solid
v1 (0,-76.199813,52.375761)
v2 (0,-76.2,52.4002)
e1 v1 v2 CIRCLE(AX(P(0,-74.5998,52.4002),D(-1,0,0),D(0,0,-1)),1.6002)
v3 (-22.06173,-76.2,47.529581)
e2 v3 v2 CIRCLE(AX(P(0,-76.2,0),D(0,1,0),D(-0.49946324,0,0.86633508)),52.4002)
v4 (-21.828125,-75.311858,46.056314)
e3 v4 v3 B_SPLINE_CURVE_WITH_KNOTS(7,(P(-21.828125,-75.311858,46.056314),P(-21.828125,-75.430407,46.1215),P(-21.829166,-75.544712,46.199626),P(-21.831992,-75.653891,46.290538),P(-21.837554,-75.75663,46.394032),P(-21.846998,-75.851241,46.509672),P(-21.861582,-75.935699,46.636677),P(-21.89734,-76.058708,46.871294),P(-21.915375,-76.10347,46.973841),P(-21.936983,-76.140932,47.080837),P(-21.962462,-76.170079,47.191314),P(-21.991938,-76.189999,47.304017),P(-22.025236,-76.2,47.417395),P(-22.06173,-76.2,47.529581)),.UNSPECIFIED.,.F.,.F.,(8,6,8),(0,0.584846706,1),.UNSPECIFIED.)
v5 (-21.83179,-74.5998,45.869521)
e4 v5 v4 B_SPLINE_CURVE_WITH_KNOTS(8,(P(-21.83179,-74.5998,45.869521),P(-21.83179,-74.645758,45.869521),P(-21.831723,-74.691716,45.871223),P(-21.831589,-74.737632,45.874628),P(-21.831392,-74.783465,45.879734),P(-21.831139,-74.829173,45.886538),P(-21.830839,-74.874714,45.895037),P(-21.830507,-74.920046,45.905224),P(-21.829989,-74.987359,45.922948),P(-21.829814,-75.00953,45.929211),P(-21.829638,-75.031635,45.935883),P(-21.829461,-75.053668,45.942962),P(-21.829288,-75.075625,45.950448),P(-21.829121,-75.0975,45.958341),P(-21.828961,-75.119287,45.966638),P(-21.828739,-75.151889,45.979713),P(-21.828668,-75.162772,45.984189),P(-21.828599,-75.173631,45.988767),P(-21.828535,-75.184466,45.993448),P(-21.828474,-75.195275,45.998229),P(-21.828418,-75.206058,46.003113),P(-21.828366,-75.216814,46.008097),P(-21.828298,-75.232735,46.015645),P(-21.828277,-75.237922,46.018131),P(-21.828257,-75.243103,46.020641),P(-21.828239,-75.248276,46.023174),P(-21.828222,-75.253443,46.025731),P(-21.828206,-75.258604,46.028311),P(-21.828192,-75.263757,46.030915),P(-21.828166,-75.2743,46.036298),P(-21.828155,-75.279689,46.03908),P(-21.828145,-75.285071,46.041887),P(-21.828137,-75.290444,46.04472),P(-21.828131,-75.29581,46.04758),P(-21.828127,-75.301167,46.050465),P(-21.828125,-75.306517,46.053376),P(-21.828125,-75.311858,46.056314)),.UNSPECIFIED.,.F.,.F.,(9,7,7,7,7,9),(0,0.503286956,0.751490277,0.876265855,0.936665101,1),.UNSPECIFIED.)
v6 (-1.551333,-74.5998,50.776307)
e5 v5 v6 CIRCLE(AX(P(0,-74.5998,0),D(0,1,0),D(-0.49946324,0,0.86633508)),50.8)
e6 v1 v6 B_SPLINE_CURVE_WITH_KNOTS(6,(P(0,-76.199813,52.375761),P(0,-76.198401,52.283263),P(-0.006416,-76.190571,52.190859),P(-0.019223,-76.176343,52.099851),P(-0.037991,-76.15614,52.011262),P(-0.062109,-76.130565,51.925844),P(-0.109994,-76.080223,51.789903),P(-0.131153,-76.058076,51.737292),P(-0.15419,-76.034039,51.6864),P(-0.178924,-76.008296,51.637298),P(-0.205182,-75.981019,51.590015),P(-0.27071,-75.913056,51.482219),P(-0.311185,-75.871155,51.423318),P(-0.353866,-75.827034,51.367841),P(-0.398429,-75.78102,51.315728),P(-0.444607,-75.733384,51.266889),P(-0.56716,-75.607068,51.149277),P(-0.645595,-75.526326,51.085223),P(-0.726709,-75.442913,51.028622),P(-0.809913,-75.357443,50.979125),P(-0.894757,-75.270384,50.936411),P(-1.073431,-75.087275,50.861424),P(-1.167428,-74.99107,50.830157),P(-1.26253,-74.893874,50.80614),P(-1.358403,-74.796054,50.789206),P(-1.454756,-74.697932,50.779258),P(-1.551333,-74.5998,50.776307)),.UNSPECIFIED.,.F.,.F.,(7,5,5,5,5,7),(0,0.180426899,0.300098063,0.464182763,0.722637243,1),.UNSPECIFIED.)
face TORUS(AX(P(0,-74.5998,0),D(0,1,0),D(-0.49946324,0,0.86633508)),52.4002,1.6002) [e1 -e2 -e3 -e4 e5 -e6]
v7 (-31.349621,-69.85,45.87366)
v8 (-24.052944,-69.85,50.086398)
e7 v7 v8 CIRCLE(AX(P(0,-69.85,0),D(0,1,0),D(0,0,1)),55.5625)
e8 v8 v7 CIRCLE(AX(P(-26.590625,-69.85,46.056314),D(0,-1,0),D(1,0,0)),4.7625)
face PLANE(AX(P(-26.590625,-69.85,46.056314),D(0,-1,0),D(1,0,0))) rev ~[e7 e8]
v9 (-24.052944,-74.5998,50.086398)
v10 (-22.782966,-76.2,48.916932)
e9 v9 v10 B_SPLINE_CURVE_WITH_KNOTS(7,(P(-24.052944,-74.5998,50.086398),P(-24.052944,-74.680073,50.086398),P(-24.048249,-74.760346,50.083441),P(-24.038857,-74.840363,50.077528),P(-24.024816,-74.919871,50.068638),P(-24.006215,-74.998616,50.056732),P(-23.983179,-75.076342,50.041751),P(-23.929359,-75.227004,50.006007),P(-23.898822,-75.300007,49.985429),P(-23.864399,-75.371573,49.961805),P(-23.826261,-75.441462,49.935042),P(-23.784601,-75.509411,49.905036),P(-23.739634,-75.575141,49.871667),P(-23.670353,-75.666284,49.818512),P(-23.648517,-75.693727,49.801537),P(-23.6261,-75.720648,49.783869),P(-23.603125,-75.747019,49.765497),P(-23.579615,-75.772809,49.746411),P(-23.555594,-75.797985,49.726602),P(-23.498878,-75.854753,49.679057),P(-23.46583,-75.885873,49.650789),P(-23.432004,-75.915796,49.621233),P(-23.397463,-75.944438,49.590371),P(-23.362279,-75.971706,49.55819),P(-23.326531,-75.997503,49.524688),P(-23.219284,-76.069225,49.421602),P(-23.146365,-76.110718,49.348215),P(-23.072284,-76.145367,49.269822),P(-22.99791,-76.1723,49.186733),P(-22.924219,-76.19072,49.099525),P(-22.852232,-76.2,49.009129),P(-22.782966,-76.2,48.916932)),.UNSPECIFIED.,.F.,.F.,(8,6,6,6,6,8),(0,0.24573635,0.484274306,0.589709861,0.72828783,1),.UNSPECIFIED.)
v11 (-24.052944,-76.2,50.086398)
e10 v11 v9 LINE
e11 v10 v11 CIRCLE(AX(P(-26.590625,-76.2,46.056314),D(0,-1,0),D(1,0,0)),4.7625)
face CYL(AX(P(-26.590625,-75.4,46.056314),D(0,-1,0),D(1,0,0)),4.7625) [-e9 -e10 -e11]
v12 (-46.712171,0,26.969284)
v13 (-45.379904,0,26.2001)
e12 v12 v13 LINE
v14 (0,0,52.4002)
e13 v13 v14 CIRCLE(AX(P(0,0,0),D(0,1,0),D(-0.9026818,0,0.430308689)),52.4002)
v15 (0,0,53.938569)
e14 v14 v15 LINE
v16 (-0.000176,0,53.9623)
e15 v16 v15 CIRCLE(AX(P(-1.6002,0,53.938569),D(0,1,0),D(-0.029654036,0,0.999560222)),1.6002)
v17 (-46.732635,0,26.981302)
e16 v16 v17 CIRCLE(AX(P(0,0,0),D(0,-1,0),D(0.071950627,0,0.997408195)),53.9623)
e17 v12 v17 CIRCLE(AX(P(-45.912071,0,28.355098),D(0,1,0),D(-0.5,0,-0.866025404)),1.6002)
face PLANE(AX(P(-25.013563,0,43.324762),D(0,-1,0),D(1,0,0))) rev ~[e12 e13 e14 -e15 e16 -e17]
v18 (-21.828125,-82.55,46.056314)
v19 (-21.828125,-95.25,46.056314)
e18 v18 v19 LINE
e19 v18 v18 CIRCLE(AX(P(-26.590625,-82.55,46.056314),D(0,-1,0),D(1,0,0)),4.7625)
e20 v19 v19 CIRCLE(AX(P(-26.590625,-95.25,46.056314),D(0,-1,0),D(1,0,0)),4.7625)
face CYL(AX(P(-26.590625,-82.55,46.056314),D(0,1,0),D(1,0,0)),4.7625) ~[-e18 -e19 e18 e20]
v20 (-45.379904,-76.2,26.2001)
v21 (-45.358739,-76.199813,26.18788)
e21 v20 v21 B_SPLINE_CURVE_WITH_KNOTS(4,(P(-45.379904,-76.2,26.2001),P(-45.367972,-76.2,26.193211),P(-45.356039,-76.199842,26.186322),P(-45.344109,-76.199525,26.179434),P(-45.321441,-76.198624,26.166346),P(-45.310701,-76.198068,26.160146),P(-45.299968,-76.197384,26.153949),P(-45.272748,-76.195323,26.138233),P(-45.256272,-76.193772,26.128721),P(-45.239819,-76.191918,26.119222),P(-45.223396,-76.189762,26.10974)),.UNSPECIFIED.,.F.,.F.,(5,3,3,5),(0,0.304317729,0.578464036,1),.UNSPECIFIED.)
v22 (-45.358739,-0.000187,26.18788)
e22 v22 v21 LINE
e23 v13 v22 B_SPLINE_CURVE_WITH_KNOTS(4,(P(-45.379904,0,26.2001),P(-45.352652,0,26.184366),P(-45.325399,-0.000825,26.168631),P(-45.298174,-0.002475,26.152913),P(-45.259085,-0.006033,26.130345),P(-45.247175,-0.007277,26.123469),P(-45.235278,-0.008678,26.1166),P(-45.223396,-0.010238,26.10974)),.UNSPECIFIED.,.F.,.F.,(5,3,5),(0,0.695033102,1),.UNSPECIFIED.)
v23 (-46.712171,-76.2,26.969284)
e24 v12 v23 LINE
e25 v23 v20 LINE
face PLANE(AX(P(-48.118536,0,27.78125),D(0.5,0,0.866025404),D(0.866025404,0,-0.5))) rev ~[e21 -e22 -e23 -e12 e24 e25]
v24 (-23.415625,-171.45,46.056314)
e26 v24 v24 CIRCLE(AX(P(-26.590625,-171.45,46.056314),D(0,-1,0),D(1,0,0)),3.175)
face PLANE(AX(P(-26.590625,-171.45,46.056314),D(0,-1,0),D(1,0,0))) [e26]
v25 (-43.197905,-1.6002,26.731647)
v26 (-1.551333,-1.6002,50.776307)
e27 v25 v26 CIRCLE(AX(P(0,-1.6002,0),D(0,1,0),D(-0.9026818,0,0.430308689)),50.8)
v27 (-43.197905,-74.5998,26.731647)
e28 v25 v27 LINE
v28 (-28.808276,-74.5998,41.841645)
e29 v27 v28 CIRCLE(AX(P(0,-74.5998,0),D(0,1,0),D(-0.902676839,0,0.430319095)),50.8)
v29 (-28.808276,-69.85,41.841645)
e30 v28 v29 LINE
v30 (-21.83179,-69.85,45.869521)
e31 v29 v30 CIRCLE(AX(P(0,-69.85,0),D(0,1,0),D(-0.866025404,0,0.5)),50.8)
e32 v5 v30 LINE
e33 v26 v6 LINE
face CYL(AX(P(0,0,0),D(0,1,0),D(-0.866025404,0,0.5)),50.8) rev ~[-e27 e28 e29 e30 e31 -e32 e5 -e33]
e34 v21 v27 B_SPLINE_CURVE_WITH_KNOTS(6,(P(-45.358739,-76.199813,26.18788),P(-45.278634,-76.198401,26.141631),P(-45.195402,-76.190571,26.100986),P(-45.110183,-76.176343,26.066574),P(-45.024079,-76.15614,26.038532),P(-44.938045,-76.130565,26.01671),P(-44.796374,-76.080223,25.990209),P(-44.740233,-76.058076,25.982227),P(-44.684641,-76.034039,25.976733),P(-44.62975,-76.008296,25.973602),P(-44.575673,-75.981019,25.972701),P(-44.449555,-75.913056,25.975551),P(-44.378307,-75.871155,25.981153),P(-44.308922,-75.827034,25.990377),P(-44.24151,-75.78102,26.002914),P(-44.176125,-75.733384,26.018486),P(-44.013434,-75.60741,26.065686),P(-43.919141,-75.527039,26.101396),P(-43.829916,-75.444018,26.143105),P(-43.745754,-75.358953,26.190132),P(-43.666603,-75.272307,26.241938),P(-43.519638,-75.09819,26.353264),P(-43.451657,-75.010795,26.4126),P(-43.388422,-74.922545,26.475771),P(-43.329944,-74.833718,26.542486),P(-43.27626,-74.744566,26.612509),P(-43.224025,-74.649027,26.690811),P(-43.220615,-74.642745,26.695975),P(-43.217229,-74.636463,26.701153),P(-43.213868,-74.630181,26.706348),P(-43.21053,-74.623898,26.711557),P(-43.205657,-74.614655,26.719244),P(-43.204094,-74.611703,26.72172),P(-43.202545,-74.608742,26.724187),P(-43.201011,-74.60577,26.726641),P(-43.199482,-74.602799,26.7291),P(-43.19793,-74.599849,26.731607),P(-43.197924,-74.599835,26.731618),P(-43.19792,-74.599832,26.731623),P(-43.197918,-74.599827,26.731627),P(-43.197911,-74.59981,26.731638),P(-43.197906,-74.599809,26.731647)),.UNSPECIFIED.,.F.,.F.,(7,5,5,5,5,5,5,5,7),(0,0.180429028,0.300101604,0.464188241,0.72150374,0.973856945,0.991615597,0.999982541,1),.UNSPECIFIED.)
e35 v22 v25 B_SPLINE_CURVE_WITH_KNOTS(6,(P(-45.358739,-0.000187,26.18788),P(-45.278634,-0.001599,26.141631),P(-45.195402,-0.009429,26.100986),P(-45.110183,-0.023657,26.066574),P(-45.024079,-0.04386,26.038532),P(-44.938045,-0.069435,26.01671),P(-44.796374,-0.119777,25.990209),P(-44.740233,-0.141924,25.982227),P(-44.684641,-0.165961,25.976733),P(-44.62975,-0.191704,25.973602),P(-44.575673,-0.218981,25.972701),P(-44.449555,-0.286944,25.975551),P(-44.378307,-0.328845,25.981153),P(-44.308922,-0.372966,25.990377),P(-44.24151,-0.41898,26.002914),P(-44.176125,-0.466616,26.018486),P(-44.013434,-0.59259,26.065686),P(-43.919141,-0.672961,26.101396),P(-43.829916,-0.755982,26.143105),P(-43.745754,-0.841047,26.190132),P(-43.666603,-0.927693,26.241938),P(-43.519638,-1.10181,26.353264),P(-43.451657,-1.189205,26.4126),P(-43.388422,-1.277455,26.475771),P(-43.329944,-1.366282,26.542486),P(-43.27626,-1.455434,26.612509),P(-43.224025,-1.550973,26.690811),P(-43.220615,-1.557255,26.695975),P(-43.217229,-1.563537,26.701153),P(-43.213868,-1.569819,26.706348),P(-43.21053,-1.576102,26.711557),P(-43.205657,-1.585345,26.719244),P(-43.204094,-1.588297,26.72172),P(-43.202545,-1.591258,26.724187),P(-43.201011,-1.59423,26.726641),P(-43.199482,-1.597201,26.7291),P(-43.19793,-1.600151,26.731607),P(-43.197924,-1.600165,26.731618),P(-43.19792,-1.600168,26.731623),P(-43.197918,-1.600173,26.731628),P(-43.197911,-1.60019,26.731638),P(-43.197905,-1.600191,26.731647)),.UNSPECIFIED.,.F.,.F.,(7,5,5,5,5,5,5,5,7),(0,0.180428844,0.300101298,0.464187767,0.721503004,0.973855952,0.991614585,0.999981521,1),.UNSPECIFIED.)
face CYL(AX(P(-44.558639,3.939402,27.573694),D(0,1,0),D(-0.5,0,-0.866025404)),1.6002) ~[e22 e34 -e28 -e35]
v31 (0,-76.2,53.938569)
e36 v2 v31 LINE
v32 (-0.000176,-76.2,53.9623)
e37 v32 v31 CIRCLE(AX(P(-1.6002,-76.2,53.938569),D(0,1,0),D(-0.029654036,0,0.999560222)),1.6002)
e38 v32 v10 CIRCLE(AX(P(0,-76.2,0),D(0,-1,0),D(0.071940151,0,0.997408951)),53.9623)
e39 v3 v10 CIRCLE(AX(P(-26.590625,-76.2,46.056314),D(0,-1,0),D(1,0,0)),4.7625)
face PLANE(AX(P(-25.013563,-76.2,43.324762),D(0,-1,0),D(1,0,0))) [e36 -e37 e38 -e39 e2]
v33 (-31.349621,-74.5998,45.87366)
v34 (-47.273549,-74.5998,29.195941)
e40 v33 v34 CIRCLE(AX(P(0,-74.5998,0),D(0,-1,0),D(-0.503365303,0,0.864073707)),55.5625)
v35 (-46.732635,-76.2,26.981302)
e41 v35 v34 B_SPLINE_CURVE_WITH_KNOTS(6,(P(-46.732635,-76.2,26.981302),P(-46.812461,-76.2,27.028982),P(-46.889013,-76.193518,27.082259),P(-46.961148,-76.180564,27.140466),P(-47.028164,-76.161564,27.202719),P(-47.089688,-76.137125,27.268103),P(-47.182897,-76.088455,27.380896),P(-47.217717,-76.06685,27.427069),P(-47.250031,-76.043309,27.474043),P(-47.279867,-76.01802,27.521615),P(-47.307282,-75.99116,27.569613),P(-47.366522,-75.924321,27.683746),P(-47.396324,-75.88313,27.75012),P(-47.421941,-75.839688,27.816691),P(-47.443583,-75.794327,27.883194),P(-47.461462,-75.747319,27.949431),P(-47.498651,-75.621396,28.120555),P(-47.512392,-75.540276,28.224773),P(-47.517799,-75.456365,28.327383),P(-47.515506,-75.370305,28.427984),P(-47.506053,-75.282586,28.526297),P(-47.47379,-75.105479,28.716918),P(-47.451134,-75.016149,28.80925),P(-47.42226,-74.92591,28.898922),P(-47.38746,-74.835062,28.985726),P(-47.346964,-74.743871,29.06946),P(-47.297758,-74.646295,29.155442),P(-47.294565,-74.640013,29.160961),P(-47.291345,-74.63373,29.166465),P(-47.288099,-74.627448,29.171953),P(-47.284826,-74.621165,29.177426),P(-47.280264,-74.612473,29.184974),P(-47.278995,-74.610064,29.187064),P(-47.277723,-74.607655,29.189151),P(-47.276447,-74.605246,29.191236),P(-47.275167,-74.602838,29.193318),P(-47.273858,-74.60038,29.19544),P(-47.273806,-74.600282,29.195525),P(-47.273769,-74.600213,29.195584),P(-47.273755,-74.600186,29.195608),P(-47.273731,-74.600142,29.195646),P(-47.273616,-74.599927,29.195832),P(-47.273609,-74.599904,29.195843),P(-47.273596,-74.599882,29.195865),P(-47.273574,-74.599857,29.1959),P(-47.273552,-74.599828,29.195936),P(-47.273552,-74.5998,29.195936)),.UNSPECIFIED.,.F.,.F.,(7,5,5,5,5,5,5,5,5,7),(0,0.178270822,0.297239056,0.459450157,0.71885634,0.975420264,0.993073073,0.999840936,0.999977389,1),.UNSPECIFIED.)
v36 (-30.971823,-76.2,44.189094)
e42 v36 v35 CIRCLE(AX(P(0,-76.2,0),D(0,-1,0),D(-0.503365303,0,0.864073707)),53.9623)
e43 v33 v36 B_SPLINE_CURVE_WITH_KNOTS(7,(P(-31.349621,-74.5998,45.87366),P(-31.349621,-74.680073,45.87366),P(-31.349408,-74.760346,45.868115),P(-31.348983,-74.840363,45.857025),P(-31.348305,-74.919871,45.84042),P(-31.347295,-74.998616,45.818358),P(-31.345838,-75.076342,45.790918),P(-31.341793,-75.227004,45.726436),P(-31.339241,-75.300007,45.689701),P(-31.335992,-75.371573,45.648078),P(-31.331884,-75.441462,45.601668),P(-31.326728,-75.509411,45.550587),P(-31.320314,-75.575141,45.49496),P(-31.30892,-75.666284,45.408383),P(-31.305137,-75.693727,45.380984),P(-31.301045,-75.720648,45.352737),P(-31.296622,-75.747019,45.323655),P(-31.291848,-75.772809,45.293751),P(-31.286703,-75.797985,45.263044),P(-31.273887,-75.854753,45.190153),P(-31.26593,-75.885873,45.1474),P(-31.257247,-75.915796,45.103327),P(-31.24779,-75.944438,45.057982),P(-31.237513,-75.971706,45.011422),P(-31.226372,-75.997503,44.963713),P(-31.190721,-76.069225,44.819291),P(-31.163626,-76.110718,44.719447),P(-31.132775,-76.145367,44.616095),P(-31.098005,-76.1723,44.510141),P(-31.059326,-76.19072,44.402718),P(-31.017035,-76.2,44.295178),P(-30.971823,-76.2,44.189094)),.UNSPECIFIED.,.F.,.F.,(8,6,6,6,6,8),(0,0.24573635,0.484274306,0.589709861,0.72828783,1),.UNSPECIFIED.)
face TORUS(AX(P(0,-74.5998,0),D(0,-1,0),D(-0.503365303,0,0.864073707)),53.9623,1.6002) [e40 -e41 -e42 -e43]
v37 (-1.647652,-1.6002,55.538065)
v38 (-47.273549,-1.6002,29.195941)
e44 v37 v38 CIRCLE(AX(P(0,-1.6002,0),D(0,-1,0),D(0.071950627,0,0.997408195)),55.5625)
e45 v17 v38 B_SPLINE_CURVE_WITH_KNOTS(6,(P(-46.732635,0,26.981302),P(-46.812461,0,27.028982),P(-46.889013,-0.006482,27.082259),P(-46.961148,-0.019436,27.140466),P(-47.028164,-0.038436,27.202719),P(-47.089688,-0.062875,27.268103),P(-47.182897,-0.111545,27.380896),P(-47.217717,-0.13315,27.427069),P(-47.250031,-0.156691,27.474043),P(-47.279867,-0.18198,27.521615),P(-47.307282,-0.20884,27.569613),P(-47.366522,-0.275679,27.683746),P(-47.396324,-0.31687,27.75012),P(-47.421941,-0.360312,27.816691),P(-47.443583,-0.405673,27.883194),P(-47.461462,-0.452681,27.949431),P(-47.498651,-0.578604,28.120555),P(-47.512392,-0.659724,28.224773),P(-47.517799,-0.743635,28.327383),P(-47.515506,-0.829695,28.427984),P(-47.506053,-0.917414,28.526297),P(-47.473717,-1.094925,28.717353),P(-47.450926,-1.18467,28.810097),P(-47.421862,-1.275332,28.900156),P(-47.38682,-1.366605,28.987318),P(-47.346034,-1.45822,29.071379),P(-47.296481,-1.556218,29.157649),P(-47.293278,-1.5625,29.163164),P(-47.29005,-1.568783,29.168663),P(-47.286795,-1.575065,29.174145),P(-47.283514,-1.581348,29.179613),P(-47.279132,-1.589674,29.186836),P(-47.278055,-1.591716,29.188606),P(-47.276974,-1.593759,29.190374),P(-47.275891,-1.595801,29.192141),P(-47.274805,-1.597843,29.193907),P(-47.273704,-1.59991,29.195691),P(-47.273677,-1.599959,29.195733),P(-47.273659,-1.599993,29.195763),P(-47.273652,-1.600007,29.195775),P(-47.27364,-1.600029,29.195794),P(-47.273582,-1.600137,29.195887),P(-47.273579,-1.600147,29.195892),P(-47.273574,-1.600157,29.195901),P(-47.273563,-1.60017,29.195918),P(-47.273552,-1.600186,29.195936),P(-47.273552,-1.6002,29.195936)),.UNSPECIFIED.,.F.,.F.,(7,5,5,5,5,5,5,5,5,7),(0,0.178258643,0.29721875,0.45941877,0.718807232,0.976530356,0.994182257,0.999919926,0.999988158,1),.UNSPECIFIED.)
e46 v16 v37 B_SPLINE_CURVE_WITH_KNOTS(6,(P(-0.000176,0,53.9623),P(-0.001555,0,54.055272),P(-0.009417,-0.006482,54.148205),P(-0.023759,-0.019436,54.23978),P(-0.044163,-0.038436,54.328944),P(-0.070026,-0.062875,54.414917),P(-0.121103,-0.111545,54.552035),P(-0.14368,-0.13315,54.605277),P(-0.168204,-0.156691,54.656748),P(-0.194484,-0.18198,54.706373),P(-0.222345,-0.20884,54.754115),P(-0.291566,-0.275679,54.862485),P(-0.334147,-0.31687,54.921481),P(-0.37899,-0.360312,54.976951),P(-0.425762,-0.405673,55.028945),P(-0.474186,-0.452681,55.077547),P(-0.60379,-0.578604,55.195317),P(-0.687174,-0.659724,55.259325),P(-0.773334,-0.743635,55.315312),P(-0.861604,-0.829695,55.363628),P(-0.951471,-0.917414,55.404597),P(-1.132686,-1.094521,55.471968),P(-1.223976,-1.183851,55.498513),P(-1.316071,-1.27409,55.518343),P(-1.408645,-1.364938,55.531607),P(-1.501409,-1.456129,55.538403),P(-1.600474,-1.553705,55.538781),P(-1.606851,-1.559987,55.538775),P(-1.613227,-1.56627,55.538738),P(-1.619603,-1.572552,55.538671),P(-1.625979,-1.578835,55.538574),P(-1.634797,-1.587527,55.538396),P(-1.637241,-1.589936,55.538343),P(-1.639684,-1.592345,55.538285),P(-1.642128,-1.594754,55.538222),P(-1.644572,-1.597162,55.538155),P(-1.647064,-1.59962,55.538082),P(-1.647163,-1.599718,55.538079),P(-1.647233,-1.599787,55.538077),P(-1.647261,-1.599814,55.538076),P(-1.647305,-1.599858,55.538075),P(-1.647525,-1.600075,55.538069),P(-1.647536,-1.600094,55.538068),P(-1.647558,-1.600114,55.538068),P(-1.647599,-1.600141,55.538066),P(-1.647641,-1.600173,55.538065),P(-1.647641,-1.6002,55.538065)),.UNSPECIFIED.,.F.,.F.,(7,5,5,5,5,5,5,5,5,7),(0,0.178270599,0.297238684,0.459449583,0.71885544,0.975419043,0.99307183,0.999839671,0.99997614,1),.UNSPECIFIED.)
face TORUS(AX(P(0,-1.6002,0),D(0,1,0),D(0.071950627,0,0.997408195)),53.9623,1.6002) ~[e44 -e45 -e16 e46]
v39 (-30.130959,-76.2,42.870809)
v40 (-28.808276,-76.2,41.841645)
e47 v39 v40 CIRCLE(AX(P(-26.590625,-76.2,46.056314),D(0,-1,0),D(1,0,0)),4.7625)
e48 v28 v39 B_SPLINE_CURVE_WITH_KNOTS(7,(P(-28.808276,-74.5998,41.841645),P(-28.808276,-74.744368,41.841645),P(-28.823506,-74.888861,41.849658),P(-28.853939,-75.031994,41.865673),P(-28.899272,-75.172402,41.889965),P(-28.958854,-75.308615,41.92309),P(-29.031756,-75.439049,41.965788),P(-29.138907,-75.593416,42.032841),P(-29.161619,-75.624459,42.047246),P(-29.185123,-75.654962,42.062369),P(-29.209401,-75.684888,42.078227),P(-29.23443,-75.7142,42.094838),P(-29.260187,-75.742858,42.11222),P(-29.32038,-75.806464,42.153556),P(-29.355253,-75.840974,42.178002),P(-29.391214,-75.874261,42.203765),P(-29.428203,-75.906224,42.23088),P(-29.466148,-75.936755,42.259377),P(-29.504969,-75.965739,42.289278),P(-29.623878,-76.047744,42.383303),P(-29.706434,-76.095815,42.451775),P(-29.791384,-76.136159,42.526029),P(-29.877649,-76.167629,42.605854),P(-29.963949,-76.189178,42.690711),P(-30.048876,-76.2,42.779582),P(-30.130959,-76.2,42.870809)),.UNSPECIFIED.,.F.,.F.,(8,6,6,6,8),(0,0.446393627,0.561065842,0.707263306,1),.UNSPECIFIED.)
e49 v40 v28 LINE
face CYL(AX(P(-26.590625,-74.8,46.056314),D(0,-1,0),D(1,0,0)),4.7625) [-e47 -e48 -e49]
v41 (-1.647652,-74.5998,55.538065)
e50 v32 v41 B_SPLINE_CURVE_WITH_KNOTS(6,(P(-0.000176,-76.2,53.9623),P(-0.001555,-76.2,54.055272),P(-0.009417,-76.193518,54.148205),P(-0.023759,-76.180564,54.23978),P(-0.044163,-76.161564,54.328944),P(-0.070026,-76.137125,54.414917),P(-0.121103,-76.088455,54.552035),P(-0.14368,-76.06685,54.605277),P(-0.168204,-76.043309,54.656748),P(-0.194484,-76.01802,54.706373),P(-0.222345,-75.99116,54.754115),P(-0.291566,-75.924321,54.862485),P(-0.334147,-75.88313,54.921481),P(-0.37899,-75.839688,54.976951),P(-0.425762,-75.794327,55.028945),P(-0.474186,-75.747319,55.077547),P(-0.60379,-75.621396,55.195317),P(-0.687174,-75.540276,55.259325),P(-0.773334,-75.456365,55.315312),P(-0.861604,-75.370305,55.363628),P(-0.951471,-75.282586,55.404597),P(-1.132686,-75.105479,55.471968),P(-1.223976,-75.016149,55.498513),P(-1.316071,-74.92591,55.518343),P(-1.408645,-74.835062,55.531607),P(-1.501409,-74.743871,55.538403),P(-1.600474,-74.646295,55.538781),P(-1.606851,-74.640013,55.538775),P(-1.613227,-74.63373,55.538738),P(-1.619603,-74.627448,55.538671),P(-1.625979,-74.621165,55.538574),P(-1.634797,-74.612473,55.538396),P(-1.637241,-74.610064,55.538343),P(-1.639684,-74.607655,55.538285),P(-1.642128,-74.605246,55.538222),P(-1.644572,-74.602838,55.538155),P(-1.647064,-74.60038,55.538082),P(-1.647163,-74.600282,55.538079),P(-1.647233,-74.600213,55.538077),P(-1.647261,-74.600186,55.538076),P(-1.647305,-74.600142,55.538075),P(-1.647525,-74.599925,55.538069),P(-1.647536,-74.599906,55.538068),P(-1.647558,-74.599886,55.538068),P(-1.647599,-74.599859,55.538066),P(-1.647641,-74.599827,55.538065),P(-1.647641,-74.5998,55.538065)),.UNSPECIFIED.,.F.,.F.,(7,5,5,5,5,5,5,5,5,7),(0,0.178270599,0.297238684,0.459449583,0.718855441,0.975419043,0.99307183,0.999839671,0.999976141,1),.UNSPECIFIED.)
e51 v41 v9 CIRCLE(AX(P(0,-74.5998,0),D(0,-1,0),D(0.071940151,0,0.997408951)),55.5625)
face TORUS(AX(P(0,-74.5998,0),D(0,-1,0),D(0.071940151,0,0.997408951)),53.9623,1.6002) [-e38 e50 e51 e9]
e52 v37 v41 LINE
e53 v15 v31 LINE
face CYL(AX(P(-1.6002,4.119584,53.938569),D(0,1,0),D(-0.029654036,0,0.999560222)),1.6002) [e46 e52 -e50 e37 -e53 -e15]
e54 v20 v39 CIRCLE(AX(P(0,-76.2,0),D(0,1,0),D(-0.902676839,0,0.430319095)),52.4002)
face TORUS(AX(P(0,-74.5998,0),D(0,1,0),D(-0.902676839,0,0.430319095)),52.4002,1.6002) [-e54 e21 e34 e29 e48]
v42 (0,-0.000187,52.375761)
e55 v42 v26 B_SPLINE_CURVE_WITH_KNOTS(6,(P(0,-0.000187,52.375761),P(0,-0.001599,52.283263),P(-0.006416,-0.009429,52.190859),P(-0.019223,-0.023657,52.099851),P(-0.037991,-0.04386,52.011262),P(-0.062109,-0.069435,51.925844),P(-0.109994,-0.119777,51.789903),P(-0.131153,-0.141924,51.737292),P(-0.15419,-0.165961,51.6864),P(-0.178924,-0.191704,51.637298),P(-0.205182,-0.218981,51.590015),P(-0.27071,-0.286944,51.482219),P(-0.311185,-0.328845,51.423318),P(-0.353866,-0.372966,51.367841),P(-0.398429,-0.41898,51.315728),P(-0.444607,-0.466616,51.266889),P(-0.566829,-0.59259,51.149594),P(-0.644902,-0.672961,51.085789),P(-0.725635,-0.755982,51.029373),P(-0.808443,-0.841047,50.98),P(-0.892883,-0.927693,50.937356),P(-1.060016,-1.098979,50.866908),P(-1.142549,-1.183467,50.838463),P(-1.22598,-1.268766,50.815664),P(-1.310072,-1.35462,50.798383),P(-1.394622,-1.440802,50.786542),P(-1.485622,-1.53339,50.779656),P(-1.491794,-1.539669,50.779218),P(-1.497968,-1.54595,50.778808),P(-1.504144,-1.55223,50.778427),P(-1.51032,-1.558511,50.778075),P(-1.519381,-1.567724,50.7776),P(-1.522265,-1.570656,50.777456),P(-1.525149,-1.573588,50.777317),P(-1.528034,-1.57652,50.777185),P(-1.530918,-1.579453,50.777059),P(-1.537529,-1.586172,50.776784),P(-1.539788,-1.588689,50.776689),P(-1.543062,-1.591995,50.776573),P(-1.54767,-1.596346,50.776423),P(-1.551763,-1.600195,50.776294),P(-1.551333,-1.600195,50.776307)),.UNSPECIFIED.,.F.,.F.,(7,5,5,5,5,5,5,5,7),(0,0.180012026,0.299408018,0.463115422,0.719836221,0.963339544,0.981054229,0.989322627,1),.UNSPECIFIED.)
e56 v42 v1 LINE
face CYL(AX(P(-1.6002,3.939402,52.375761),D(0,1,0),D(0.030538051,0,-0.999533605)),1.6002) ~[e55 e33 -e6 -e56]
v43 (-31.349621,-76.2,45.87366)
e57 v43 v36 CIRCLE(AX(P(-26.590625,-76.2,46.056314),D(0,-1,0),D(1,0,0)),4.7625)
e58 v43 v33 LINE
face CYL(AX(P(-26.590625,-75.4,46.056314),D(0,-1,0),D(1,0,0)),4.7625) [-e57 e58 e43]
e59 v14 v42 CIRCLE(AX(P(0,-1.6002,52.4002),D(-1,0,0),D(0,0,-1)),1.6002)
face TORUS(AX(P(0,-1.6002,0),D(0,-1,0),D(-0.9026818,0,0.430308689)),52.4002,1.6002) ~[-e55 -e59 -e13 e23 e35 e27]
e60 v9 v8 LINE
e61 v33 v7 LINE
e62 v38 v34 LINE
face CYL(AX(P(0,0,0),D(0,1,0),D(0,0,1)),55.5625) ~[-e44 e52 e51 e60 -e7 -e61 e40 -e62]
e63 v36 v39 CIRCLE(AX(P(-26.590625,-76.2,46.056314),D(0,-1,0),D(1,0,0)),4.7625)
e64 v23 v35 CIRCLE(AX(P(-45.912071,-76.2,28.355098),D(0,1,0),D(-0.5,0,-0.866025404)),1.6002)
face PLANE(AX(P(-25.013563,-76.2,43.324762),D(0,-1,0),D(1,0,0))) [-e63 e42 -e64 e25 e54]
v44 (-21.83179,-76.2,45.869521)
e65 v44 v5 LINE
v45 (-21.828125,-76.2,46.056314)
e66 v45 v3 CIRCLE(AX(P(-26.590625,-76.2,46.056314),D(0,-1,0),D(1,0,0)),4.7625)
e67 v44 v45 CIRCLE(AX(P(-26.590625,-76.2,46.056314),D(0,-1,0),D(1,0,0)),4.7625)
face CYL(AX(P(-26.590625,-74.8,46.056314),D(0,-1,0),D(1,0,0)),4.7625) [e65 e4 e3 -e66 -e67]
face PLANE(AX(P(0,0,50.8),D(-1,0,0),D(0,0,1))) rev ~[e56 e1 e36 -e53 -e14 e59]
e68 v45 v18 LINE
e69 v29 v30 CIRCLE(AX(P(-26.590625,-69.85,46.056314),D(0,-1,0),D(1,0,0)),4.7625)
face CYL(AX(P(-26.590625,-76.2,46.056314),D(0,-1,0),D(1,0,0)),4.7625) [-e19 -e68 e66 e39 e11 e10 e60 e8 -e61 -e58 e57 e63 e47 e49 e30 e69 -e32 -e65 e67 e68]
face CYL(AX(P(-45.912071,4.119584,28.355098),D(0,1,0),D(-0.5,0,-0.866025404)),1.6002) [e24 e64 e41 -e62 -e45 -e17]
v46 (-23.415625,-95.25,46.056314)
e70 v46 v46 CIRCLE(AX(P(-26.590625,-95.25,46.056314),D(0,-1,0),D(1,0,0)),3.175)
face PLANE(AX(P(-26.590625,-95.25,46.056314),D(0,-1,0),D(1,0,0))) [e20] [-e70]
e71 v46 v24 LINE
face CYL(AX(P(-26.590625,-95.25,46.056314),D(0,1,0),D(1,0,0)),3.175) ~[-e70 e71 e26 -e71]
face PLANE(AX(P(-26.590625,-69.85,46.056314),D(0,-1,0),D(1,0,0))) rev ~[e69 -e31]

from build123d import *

# Parameters (mm, degrees)
F1_DEPTH     = 76.2
F2_R         = 4.7625
F3_DEPTH     = 6.35
F4_R         = 4.7625
F5_DEPTH     = 12.7
F6_R         = 3.175
F7_DEPTH     = 76.2
F8_T1_DEPTH  = 84.4391678442
F8_T3_DEPTH  = 84.0788040297
F8_T8_ANGLE  = 33.9025331494
F8_S9_R      = 4.7625
F8_T10_DEPTH = 21
F8_T14_ANGLE = 34.4766821812
F8_S15_R     = 4.7625
F8_T16_DEPTH = 21
F8_T20_ANGLE = 33.9025331494
F8_S21_R     = 4.7625
F8_T22_DEPTH = 20
F8_T26_ANGLE = 34.4766821812
F8_S27_R     = 4.7625
F8_T28_DEPTH = 20
F8_T30_ANGLE = 68.2520650555
F8_T32_ANGLE = 69.0256961544


# Not quite as in the source:
# - a fillet or chamfer that OpenCascade refuses, or shapes differently, is made with other operations: its cross-section is extruded or revolved along the edge and cut away or added


with BuildPart() as f1:
    # F0 (on Front) → F1 (new body)
    with BuildSketch(Plane.XZ):
        with BuildLine():
            Line((0, 50.8), (0, 55.5625))
            ThreePointArc((0, 55.5625), (-27.78125, 48.1185364978), (-48.1185364978, 27.78125))
            Line((-48.1185364978, 27.78125), (-43.9940905122, 25.4))
            ThreePointArc((-43.9940905122, 25.4), (-25.4, 43.9940905122), (0, 50.8))
        make_face()
    extrude(amount=F1_DEPTH)

    # F2 (on face) → F3 (join, symmetric)
    with BuildSketch(Plane.XZ.offset(76.2)):
        with Locations((-26.590625, 46.056313505)):
            Circle(F2_R)
    extrude(amount=F3_DEPTH, both=True)

    # F4 (on face) → F5 (join)
    with BuildSketch(Plane.XZ.offset(82.55)):
        with Locations((-26.590625, 46.056313505)):
            Circle(F4_R)
    extrude(amount=F5_DEPTH)

    # F6 (on face) → F7 (join)
    with BuildSketch(Plane.XZ.offset(95.25)):
        with Locations((-26.590625, 46.056313505)):
            Circle(F6_R)
    extrude(amount=F7_DEPTH)

    # F8: fillet of radius 1.6002 on 10 edges, made by hand

    # F8_s2 → F8_t1 (cut)
    with BuildSketch(Plane.XZ.offset(-4.1195839221)):
        with BuildLine():
            ThreePointArc((-46.7121706404, 26.9692842937), (-47.4637166662, 27.9639017102), (-47.2735488472, 29.1959412529))
            ThreePointArc((-47.2735488472, 29.1959412529), (-47.7012874507, 28.4917283049), (-48.1185364978, 27.78125))
            Line((-48.1185364978, 27.78125), (-46.7121706404, 26.9692842937))
        make_face()
        with BuildLine():
            ThreePointArc((-1.6476523888, 55.5380648552), (-0.4855909368, 55.0867352461), (0, 53.9385685873))
            Line((0, 53.9385685873), (0, 55.5625))
            ThreePointArc((0, 55.5625), (-0.8239167844, 55.5563908779), (-1.6476523888, 55.5380648552))
        make_face()
    extrude(amount=F8_T1_DEPTH, mode=Mode.SUBTRACT)

    # F8_s4 → F8_t3 (cut)
    with BuildSketch(Plane.XZ.offset(-3.9394020148)):
        with BuildLine():
            ThreePointArc((-45.3587394005, 26.187880403), (-44.1681291542, 26.0218753898), (-43.197905381, 26.7316473622))
            ThreePointArc((-43.197905381, 26.7316473622), (-43.6010820753, 26.0688634556), (-43.9940905122, 25.4))
            Line((-43.9940905122, 25.4), (-45.3587394005, 26.187880403))
        make_face()
        with BuildLine():
            ThreePointArc((-1.5513330102, 50.7763071313), (-0.4515405646, 51.2616595801), (0, 52.3757608059))
            Line((0, 52.3757608059), (0, 50.8))
            ThreePointArc((0, 50.8), (-0.7757569627, 50.7940764375), (-1.5513330102, 50.7763071313))
        make_face()
    extrude(amount=F8_T3_DEPTH, mode=Mode.SUBTRACT)


with BuildPart() as f8_tool6:
    # F8_s7 → F8_t8 (revolve)
    with BuildSketch(Plane(origin=(0, 0, 0), x_dir=(0, 1, 0), z_dir=(0.8640737071, 0, 0.5033653034))):
        with BuildLine():
            ThreePointArc((-74.5998, 55.5625), (-75.7313122713, 55.0938122713), (-76.2, 53.9623))
            Line((-76.2, 53.9623), (-76.2, 55.5625))
            Line((-76.2, 55.5625), (-74.5998, 55.5625))
        make_face()
    revolve(axis=Axis((0, -76.2, 0), (0, -1, 0)), revolution_arc=F8_T8_ANGLE)

    # F8_s9 → F8_t10 (cut, symmetric)
    with BuildSketch(Plane.XZ.offset(75.4)):
        with Locations((-26.590625, 46.056313505)):
            Circle(F8_S9_R)
    extrude(amount=F8_T10_DEPTH, both=True, mode=Mode.SUBTRACT)


with BuildPart() as f1_1:
    add(f1.part)

    # F8_t5: cut F8_tool6
    add(f8_tool6.part, mode=Mode.SUBTRACT)


with BuildPart() as f8_tool12:
    # F8_s13 → F8_t14 (revolve)
    with BuildSketch(Plane(origin=(0, 0, 0), x_dir=(0, 1, 0), z_dir=(-0.4303190954, 0, -0.9026768393))):
        with BuildLine():
            ThreePointArc((-74.5998, -50.8), (-75.7313122713, -51.2686877287), (-76.2, -52.4002))
            Line((-76.2, -52.4002), (-76.2, -50.8))
            Line((-76.2, -50.8), (-74.5998, -50.8))
        make_face()
    revolve(axis=Axis((0, -76.2, 0), (0, 1, 0)), revolution_arc=F8_T14_ANGLE)

    # F8_s15 → F8_t16 (cut, symmetric)
    with BuildSketch(Plane.XZ.offset(74.8)):
        with Locations((-26.590625, 46.056313505)):
            Circle(F8_S15_R)
    extrude(amount=F8_T16_DEPTH, both=True, mode=Mode.SUBTRACT)


with BuildPart() as f1_2:
    add(f1_1.part)

    # F8_t11: cut F8_tool12
    add(f8_tool12.part, mode=Mode.SUBTRACT)


with BuildPart() as f8_tool18:
    # F8_s19 → F8_t20 (revolve)
    with BuildSketch(Plane(origin=(0, 0, 0), x_dir=(0, 1, 0), z_dir=(0.9974089506, 0, -0.071940151))):
        with BuildLine():
            ThreePointArc((-74.5998, 55.5625), (-75.7313122713, 55.0938122713), (-76.2, 53.9623))
            Line((-76.2, 53.9623), (-76.2, 55.5625))
            Line((-76.2, 55.5625), (-74.5998, 55.5625))
        make_face()
    revolve(axis=Axis((0, -76.2, 0), (0, -1, 0)), revolution_arc=F8_T20_ANGLE)

    # F8_s21 → F8_t22 (cut, symmetric)
    with BuildSketch(Plane.XZ.offset(75.4)):
        with Locations((-26.590625, 46.056313505)):
            Circle(F8_S21_R)
    extrude(amount=F8_T22_DEPTH, both=True, mode=Mode.SUBTRACT)


with BuildPart() as f1_3:
    add(f1_2.part)

    # F8_t17: cut F8_tool18
    add(f8_tool18.part, mode=Mode.SUBTRACT)


with BuildPart() as f8_tool24:
    # F8_s25 → F8_t26 (revolve)
    with BuildSketch(Plane(origin=(0, 0, 0), x_dir=(0, 1, 0), z_dir=(-0.8663350804, 0, -0.4994632404))):
        with BuildLine():
            ThreePointArc((-74.5998, -50.8), (-75.7313122713, -51.2686877287), (-76.2, -52.4002))
            Line((-76.2, -52.4002), (-76.2, -50.8))
            Line((-76.2, -50.8), (-74.5998, -50.8))
        make_face()
    revolve(axis=Axis((0, -76.2, 0), (0, 1, 0)), revolution_arc=F8_T26_ANGLE)

    # F8_s27 → F8_t28 (cut, symmetric)
    with BuildSketch(Plane.XZ.offset(74.8)):
        with Locations((-26.590625, 46.056313505)):
            Circle(F8_S27_R)
    extrude(amount=F8_T28_DEPTH, both=True, mode=Mode.SUBTRACT)


with BuildPart() as f1_4:
    add(f1_3.part)

    # F8_t23: cut F8_tool24
    add(f8_tool24.part, mode=Mode.SUBTRACT)

    # F8_s29 → F8_t30 (revolve, cut)
    with BuildSketch(Plane(origin=(0, 0, 0), x_dir=(0, 1, 0), z_dir=(0.9974081949, 0, -0.0719506275))):
        with BuildLine():
            ThreePointArc((-1.6002, 55.5625), (-0.4686877287, 55.0938122713), (0, 53.9623))
            Line((0, 53.9623), (0, 55.5625))
            Line((0, 55.5625), (-1.6002, 55.5625))
        make_face()
    revolve(axis=Axis((0, 0, 0), (0, -1, 0)), revolution_arc=F8_T30_ANGLE, mode=Mode.SUBTRACT)

    # F8_s31 → F8_t32 (revolve, cut)
    with BuildSketch(Plane(origin=(0, 0, 0), x_dir=(0, 1, 0), z_dir=(-0.4303086891, 0, -0.9026818))):
        with BuildLine():
            ThreePointArc((-1.6002, -50.8), (-0.4686877287, -51.2686877287), (0, -52.4002))
            Line((0, -52.4002), (0, -50.8))
            Line((0, -50.8), (-1.6002, -50.8))
        make_face()
    revolve(axis=Axis((0, 0, 0), (0, 1, 0)), revolution_arc=F8_T32_ANGLE, mode=Mode.SUBTRACT)


solid = f1_4.part
